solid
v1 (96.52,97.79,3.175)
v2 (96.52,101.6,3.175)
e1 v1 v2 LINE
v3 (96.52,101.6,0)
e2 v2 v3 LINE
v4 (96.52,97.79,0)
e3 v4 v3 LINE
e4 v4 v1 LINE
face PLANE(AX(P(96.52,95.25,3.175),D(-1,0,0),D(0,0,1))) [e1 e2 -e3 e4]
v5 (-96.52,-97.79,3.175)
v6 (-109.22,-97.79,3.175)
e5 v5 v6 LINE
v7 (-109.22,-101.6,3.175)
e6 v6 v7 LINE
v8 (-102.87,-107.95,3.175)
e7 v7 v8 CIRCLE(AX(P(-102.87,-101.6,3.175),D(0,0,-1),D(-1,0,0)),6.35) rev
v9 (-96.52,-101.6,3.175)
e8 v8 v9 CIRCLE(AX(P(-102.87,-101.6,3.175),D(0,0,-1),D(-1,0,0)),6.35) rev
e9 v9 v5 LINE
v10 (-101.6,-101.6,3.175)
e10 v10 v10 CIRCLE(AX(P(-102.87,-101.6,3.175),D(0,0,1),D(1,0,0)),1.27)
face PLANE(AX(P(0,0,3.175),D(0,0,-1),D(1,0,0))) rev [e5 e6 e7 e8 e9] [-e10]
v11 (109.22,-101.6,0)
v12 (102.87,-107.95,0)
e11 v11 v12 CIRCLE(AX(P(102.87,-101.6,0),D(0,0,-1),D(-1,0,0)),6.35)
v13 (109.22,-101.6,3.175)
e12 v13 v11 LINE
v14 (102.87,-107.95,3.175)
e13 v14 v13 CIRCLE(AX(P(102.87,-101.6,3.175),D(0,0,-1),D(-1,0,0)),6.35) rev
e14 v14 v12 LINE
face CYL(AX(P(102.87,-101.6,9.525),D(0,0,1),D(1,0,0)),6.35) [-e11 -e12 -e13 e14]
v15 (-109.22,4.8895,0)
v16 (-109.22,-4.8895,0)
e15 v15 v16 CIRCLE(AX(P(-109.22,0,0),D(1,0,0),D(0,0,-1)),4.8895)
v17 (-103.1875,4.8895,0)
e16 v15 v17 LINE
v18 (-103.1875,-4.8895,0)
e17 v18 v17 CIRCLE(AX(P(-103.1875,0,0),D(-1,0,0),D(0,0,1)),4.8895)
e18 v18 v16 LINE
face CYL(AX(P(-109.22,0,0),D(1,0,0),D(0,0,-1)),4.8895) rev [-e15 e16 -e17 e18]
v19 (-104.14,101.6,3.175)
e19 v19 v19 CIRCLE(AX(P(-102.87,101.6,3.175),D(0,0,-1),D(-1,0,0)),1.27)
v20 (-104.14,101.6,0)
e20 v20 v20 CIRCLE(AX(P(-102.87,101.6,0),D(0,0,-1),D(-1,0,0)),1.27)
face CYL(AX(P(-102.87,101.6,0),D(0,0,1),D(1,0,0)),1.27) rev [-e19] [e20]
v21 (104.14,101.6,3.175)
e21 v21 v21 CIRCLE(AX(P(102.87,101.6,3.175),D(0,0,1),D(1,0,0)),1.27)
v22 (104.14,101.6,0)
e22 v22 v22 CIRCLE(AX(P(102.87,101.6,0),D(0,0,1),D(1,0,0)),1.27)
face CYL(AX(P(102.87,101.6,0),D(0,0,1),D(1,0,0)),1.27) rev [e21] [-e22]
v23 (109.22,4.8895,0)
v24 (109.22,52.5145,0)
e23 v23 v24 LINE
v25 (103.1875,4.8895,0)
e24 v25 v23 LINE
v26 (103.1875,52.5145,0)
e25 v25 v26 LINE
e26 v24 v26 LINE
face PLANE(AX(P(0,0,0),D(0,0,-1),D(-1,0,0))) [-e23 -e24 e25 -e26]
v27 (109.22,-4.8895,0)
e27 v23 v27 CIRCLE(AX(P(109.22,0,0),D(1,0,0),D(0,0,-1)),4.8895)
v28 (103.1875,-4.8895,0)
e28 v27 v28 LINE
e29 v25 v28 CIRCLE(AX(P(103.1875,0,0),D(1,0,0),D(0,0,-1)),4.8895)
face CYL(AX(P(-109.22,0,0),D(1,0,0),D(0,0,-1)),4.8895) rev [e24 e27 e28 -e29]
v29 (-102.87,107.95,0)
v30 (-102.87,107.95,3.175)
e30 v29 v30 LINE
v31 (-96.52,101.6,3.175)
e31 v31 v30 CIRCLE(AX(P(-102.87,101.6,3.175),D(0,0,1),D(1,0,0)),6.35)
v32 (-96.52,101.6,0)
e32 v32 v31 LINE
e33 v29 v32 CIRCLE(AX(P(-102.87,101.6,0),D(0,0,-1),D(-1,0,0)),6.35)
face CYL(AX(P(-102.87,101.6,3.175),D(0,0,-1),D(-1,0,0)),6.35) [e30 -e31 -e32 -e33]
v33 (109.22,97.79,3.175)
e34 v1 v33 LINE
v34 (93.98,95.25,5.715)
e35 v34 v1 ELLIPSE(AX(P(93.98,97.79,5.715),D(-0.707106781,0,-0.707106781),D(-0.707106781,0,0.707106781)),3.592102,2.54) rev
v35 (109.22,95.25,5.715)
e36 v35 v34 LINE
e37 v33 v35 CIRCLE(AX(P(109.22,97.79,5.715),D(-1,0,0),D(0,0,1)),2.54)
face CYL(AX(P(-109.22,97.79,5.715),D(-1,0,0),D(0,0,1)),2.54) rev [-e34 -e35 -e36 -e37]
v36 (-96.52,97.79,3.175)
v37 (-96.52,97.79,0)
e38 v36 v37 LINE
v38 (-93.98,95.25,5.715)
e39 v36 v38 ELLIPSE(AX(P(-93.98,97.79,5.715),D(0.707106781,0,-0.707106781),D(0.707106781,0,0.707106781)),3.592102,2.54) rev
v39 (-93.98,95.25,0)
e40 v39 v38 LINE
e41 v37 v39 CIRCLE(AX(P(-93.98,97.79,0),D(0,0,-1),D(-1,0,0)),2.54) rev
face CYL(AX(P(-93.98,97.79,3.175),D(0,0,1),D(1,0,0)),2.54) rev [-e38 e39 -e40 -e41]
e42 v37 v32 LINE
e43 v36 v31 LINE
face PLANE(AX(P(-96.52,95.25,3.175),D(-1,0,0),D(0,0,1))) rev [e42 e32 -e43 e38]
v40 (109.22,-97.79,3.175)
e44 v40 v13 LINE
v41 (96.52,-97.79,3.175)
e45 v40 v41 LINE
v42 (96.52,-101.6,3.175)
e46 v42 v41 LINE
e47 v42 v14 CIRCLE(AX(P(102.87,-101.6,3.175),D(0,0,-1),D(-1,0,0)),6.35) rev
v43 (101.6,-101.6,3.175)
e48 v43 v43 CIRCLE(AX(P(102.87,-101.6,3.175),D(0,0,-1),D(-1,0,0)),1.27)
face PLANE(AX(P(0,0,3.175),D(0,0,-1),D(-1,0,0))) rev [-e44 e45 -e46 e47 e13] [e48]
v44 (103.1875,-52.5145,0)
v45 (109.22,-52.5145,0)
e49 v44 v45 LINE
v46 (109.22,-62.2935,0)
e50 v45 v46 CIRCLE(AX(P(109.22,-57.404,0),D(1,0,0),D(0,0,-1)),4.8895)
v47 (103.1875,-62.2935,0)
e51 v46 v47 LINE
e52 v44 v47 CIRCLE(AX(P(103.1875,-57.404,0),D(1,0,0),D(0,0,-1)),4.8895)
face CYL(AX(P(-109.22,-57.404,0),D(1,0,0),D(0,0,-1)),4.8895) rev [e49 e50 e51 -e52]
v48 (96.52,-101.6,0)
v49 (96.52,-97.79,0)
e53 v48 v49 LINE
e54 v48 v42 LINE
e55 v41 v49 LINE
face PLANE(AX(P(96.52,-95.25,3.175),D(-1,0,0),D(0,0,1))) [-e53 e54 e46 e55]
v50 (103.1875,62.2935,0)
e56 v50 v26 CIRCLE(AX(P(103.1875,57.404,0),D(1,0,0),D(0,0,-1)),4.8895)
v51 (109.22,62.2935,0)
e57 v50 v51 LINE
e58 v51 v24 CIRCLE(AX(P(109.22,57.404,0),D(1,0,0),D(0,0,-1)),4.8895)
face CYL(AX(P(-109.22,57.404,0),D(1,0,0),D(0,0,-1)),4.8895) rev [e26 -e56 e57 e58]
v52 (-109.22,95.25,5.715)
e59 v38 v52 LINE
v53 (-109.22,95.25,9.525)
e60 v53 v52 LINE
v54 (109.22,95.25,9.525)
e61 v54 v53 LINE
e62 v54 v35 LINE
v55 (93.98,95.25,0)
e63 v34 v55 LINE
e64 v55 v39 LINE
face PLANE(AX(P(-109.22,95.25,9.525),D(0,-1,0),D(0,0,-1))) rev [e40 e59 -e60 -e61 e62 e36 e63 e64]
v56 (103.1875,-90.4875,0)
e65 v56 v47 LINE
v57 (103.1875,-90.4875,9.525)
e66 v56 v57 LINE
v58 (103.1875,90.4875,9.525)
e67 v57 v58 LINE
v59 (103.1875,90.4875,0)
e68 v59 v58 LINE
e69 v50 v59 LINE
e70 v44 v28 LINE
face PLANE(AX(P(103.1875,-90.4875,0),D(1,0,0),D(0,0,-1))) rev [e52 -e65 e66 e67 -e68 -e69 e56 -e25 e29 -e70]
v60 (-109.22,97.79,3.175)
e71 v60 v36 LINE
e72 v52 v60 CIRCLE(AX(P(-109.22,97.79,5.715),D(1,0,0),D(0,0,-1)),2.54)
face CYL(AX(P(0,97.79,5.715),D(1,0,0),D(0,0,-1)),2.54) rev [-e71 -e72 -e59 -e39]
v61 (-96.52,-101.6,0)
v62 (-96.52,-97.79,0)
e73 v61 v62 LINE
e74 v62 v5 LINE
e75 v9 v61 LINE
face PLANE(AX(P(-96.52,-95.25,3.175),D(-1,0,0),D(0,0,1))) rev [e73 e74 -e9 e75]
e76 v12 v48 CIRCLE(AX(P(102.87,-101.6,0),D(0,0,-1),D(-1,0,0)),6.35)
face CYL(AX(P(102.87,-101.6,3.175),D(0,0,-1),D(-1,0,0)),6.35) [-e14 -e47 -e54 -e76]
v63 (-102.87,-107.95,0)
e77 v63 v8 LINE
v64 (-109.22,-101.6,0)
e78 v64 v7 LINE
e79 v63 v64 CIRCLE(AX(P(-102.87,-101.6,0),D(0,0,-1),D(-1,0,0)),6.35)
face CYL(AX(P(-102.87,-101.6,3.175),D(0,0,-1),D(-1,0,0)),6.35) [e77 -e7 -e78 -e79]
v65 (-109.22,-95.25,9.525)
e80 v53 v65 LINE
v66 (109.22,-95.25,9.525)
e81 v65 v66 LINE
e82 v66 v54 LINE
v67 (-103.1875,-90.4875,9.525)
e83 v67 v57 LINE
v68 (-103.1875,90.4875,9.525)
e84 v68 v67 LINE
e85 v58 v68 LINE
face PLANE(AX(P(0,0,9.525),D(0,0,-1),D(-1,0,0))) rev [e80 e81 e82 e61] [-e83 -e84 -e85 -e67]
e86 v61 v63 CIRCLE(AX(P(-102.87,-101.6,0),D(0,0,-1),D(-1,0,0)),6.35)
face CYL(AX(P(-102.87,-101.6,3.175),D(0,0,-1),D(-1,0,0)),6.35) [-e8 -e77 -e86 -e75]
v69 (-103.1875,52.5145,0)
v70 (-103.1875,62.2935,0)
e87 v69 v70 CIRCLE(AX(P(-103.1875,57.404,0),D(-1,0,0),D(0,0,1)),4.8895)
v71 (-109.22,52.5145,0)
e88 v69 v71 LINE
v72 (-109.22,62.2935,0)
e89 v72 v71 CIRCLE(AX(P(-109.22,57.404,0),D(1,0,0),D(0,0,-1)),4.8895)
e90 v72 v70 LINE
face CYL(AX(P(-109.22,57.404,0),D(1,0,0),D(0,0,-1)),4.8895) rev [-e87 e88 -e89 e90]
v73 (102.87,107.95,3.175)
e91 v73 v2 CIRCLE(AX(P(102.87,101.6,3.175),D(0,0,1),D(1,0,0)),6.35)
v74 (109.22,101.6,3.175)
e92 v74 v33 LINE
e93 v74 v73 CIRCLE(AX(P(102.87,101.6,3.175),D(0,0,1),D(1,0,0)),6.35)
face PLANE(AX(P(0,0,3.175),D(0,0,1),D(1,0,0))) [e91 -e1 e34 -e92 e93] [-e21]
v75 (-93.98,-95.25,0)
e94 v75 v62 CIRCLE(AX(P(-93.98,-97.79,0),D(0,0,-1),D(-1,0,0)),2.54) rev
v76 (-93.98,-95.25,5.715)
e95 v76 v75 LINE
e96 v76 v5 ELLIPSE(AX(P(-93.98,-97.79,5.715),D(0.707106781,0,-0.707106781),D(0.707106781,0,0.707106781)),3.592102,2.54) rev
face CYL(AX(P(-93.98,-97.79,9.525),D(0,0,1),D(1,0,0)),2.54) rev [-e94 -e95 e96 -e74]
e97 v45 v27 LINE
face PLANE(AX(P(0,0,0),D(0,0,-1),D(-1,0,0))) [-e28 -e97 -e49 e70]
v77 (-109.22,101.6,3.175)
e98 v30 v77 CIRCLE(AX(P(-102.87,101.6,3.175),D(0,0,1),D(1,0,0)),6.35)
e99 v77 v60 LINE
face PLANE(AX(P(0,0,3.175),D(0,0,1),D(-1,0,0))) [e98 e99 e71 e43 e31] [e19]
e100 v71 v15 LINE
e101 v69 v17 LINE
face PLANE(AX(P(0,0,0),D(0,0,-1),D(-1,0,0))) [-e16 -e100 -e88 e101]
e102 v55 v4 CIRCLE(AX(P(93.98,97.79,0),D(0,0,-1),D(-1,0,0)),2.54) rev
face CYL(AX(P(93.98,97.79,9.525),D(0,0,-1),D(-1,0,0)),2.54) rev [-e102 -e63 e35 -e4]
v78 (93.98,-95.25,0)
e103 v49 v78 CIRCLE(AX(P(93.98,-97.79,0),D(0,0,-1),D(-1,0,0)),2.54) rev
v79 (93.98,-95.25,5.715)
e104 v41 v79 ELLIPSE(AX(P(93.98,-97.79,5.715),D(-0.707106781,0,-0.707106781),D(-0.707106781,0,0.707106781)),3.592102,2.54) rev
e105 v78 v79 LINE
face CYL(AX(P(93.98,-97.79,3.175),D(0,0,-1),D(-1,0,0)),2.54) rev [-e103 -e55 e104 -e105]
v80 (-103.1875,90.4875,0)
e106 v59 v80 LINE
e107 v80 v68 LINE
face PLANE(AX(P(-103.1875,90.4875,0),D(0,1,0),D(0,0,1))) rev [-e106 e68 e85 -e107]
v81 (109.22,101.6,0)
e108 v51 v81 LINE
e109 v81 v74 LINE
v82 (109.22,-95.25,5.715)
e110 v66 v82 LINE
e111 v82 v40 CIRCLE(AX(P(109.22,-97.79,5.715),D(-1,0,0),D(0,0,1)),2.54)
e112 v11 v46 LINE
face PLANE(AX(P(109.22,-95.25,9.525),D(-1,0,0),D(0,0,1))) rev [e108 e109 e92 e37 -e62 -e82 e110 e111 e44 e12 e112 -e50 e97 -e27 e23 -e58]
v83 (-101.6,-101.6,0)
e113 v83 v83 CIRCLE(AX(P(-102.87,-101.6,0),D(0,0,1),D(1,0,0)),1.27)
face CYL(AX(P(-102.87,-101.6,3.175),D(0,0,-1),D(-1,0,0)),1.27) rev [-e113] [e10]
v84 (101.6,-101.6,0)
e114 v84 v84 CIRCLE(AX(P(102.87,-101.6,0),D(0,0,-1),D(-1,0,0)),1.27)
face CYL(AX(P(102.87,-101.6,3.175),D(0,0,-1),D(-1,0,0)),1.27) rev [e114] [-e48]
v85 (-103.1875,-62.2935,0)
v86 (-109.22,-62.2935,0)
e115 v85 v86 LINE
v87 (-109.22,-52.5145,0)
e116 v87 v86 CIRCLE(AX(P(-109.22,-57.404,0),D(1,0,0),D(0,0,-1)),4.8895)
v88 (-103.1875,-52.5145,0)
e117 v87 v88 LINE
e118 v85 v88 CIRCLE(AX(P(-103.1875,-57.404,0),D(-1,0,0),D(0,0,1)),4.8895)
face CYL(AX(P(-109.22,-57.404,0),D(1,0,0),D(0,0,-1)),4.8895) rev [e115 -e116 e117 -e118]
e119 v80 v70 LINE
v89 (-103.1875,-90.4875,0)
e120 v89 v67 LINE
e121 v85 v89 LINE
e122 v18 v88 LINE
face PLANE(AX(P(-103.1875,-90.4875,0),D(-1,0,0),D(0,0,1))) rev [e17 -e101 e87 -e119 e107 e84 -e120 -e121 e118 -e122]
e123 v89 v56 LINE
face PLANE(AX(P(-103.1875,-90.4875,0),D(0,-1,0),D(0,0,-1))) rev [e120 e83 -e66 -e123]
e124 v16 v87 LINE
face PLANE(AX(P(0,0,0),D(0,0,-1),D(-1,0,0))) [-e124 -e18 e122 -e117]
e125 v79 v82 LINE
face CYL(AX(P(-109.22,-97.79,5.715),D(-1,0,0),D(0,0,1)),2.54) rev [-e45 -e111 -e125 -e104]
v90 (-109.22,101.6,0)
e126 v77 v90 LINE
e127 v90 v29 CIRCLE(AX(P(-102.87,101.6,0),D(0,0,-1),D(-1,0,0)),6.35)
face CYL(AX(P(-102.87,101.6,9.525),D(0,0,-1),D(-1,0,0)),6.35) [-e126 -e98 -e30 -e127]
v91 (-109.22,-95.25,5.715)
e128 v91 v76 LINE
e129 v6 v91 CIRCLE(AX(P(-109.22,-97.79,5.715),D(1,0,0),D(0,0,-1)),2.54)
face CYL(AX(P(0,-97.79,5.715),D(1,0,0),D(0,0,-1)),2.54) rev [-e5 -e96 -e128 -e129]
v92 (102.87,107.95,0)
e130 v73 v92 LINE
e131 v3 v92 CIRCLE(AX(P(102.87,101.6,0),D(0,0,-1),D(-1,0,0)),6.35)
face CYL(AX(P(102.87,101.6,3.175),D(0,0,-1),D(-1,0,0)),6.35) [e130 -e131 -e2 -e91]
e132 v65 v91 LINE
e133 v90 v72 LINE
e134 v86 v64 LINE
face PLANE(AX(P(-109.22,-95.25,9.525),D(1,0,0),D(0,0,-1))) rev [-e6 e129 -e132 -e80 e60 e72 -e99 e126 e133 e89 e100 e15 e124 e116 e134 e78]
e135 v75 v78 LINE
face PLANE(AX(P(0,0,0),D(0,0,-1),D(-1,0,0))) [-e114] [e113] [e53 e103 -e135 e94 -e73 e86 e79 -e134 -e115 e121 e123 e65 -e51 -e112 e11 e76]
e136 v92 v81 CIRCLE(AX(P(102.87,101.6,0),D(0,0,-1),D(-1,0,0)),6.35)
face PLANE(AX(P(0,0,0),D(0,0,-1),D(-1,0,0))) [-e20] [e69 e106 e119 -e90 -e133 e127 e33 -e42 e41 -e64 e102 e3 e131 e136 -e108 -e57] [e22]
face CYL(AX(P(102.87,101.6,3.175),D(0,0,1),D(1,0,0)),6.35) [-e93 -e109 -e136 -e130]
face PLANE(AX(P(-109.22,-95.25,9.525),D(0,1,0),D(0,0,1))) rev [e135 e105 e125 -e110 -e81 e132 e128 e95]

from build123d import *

# Parameters (mm, degrees)
SKETCH1_W            = 218.44
SKETCH1_H            = 190.5
BOSS_EXTRUDE1_DEPTH  = 9.525
SKETCH2_W            = 206.375
SKETCH2_H            = 180.975
CUT_EXTRUDE1_DEPTH   = 9.525
SKETCH3_R            = 4.8895
CUT_EXTRUDE2_DEPTH   = 239.49386098
SKETCH4_W            = 12.7
SKETCH4_H            = 12.7
BOSS_EXTRUDE2_DEPTH  = 3.175
SKETCH5_R            = 1.27
CUT_EXTRUDE3_DEPTH   = 154.69623743
FILLET1_R            = 6.35
FILLET2_R            = 2.54
FILLET1_OF_MIRROR1_R = 6.35
FILLET2_OF_MIRROR1_R = 2.54
SKETCH6_W            = 12.7
SKETCH6_H            = 12.7
SKETCH6_R            = 1.27
BOSS_EXTRUDE3_DEPTH  = 3.175
FILLET3_R            = 2.54
FILLET4_R            = 6.35
FILLET3_OF_MIRROR7_R = 2.54
FILLET4_OF_MIRROR7_R = 6.35


with BuildPart() as part:
    # Sketch1 → Boss-Extrude1 (new body)
    with BuildSketch(Plane.XY):
        Rectangle(SKETCH1_W, SKETCH1_H)
    extrude(amount=BOSS_EXTRUDE1_DEPTH)

    # Sketch2 → Cut-Extrude1 (cut)
    with BuildSketch(Plane.XY.offset(9.525)):
        Rectangle(SKETCH2_W, SKETCH2_H)
    extrude(amount=-CUT_EXTRUDE1_DEPTH, mode=Mode.SUBTRACT)

    # Sketch3 → Cut-Extrude2 (cut, through all)
    with BuildSketch(Plane(origin=(109.22, 0, 0), x_dir=(0, 0, -1), z_dir=(1, 0, 0))):
        Circle(SKETCH3_R)
        with Locations((0, 57.404)):
            Circle(SKETCH3_R)
        with Locations((0, -57.404)):
            Circle(SKETCH3_R)
    extrude(amount=-CUT_EXTRUDE2_DEPTH, mode=Mode.SUBTRACT)

    # Sketch4 → Boss-Extrude2 (add)
    with BuildSketch(Plane(origin=(0, 0, 0), x_dir=(-1, 0, 0), z_dir=(0, 0, -1))):
        with Locations((-102.87, 101.6)):
            Rectangle(SKETCH4_W, SKETCH4_H)
    boss_extrude2 = extrude(amount=-BOSS_EXTRUDE2_DEPTH)

    # Sketch5 → Cut-Extrude3 (cut, through all)
    with BuildSketch(Plane.XY.offset(3.175)):
        with Locations((102.87, 101.6)):
            Circle(SKETCH5_R)
    cut_extrude3 = extrude(amount=-CUT_EXTRUDE3_DEPTH, mode=Mode.SUBTRACT)

    # Fillet1
    fillet1_edges = [part.edges().sort_by_distance(p)[0] for p in [
        (96.52, 107.95, 1.5875),
        (109.22, 107.95, 1.5875),
    ]]
    fillet(fillet1_edges, radius=FILLET1_R - 0.0001)  # a hair under: the kernel refuses the full size

    # Fillet2
    fillet2_edges = [part.edges().sort_by_distance(p)[0] for p in [
        (102.87, 95.25, 3.175),
        (96.52, 95.25, 1.5875),
    ]]
    fillet(fillet2_edges, radius=FILLET2_R)

    # Mirror1: Boss-Extrude2, Cut-Extrude3 across plane
    add(boss_extrude2.mirror(Plane(origin=(0, 0, 0), x_dir=(0, 0, 1), z_dir=(1, 0, 0))))
    add(cut_extrude3.mirror(Plane(origin=(0, 0, 0), x_dir=(0, 0, 1), z_dir=(1, 0, 0))), mode=Mode.SUBTRACT)

    # Fillet1 of Mirror1
    fillet1_of_mirror1_edges = [part.edges().sort_by_distance(p)[0] for p in [
        (-96.52, 107.95, 1.5875),
        (-109.22, 107.95, 1.5875),
    ]]
    fillet(fillet1_of_mirror1_edges, radius=FILLET1_OF_MIRROR1_R - 0.0001)  # a hair under: the kernel refuses the full size

    # Fillet2 of Mirror1
    fillet2_of_mirror1_edges = [part.edges().sort_by_distance(p)[0] for p in [
        (-102.87, 95.25, 3.175),
        (-96.52, 95.25, 1.5875),
    ]]
    fillet(fillet2_of_mirror1_edges, radius=FILLET2_OF_MIRROR1_R)

    # Sketch6 → Boss-Extrude3 (add)
    with BuildSketch(Plane(origin=(0, 0, 0), x_dir=(-1, 0, 0), z_dir=(0, 0, -1))):
        with Locations((-102.87, -101.6)):
            Rectangle(SKETCH6_W, SKETCH6_H)
        with Locations((-102.87, -101.6)):
            Circle(SKETCH6_R, mode=Mode.SUBTRACT)
    boss_extrude3 = extrude(amount=-BOSS_EXTRUDE3_DEPTH)

    # Fillet3
    fillet3_edges = [part.edges().sort_by_distance(p)[0] for p in [
        (102.87, -95.25, 3.175),
        (96.52, -95.25, 1.5875),
    ]]
    fillet(fillet3_edges, radius=FILLET3_R)

    # Fillet4
    fillet4_edges = [part.edges().sort_by_distance(p)[0] for p in [
        (109.22, -107.95, 1.5875),
        (96.52, -107.95, 1.5875),
    ]]
    fillet(fillet4_edges, radius=FILLET4_R - 0.0001)  # a hair under: the kernel refuses the full size

    # Mirror7: Boss-Extrude3 across plane
    add(boss_extrude3.mirror(Plane(origin=(0, 0, 0), x_dir=(0, 0, 1), z_dir=(1, 0, 0))))

    # Fillet3 of Mirror7
    fillet3_of_mirror7_edges = [part.edges().sort_by_distance(p)[0] for p in [
        (-102.87, -95.25, 3.175),
        (-96.52, -95.25, 1.5875),
    ]]
    fillet(fillet3_of_mirror7_edges, radius=FILLET3_OF_MIRROR7_R)

    # Fillet4 of Mirror7
    fillet4_of_mirror7_edges = [part.edges().sort_by_distance(p)[0] for p in [
        (-109.22, -107.95, 1.5875),
        (-96.52, -107.95, 1.5875),
    ]]
    fillet(fillet4_of_mirror7_edges, radius=FILLET4_OF_MIRROR7_R - 0.0001)  # a hair under: the kernel refuses the full size


solid = part.part
